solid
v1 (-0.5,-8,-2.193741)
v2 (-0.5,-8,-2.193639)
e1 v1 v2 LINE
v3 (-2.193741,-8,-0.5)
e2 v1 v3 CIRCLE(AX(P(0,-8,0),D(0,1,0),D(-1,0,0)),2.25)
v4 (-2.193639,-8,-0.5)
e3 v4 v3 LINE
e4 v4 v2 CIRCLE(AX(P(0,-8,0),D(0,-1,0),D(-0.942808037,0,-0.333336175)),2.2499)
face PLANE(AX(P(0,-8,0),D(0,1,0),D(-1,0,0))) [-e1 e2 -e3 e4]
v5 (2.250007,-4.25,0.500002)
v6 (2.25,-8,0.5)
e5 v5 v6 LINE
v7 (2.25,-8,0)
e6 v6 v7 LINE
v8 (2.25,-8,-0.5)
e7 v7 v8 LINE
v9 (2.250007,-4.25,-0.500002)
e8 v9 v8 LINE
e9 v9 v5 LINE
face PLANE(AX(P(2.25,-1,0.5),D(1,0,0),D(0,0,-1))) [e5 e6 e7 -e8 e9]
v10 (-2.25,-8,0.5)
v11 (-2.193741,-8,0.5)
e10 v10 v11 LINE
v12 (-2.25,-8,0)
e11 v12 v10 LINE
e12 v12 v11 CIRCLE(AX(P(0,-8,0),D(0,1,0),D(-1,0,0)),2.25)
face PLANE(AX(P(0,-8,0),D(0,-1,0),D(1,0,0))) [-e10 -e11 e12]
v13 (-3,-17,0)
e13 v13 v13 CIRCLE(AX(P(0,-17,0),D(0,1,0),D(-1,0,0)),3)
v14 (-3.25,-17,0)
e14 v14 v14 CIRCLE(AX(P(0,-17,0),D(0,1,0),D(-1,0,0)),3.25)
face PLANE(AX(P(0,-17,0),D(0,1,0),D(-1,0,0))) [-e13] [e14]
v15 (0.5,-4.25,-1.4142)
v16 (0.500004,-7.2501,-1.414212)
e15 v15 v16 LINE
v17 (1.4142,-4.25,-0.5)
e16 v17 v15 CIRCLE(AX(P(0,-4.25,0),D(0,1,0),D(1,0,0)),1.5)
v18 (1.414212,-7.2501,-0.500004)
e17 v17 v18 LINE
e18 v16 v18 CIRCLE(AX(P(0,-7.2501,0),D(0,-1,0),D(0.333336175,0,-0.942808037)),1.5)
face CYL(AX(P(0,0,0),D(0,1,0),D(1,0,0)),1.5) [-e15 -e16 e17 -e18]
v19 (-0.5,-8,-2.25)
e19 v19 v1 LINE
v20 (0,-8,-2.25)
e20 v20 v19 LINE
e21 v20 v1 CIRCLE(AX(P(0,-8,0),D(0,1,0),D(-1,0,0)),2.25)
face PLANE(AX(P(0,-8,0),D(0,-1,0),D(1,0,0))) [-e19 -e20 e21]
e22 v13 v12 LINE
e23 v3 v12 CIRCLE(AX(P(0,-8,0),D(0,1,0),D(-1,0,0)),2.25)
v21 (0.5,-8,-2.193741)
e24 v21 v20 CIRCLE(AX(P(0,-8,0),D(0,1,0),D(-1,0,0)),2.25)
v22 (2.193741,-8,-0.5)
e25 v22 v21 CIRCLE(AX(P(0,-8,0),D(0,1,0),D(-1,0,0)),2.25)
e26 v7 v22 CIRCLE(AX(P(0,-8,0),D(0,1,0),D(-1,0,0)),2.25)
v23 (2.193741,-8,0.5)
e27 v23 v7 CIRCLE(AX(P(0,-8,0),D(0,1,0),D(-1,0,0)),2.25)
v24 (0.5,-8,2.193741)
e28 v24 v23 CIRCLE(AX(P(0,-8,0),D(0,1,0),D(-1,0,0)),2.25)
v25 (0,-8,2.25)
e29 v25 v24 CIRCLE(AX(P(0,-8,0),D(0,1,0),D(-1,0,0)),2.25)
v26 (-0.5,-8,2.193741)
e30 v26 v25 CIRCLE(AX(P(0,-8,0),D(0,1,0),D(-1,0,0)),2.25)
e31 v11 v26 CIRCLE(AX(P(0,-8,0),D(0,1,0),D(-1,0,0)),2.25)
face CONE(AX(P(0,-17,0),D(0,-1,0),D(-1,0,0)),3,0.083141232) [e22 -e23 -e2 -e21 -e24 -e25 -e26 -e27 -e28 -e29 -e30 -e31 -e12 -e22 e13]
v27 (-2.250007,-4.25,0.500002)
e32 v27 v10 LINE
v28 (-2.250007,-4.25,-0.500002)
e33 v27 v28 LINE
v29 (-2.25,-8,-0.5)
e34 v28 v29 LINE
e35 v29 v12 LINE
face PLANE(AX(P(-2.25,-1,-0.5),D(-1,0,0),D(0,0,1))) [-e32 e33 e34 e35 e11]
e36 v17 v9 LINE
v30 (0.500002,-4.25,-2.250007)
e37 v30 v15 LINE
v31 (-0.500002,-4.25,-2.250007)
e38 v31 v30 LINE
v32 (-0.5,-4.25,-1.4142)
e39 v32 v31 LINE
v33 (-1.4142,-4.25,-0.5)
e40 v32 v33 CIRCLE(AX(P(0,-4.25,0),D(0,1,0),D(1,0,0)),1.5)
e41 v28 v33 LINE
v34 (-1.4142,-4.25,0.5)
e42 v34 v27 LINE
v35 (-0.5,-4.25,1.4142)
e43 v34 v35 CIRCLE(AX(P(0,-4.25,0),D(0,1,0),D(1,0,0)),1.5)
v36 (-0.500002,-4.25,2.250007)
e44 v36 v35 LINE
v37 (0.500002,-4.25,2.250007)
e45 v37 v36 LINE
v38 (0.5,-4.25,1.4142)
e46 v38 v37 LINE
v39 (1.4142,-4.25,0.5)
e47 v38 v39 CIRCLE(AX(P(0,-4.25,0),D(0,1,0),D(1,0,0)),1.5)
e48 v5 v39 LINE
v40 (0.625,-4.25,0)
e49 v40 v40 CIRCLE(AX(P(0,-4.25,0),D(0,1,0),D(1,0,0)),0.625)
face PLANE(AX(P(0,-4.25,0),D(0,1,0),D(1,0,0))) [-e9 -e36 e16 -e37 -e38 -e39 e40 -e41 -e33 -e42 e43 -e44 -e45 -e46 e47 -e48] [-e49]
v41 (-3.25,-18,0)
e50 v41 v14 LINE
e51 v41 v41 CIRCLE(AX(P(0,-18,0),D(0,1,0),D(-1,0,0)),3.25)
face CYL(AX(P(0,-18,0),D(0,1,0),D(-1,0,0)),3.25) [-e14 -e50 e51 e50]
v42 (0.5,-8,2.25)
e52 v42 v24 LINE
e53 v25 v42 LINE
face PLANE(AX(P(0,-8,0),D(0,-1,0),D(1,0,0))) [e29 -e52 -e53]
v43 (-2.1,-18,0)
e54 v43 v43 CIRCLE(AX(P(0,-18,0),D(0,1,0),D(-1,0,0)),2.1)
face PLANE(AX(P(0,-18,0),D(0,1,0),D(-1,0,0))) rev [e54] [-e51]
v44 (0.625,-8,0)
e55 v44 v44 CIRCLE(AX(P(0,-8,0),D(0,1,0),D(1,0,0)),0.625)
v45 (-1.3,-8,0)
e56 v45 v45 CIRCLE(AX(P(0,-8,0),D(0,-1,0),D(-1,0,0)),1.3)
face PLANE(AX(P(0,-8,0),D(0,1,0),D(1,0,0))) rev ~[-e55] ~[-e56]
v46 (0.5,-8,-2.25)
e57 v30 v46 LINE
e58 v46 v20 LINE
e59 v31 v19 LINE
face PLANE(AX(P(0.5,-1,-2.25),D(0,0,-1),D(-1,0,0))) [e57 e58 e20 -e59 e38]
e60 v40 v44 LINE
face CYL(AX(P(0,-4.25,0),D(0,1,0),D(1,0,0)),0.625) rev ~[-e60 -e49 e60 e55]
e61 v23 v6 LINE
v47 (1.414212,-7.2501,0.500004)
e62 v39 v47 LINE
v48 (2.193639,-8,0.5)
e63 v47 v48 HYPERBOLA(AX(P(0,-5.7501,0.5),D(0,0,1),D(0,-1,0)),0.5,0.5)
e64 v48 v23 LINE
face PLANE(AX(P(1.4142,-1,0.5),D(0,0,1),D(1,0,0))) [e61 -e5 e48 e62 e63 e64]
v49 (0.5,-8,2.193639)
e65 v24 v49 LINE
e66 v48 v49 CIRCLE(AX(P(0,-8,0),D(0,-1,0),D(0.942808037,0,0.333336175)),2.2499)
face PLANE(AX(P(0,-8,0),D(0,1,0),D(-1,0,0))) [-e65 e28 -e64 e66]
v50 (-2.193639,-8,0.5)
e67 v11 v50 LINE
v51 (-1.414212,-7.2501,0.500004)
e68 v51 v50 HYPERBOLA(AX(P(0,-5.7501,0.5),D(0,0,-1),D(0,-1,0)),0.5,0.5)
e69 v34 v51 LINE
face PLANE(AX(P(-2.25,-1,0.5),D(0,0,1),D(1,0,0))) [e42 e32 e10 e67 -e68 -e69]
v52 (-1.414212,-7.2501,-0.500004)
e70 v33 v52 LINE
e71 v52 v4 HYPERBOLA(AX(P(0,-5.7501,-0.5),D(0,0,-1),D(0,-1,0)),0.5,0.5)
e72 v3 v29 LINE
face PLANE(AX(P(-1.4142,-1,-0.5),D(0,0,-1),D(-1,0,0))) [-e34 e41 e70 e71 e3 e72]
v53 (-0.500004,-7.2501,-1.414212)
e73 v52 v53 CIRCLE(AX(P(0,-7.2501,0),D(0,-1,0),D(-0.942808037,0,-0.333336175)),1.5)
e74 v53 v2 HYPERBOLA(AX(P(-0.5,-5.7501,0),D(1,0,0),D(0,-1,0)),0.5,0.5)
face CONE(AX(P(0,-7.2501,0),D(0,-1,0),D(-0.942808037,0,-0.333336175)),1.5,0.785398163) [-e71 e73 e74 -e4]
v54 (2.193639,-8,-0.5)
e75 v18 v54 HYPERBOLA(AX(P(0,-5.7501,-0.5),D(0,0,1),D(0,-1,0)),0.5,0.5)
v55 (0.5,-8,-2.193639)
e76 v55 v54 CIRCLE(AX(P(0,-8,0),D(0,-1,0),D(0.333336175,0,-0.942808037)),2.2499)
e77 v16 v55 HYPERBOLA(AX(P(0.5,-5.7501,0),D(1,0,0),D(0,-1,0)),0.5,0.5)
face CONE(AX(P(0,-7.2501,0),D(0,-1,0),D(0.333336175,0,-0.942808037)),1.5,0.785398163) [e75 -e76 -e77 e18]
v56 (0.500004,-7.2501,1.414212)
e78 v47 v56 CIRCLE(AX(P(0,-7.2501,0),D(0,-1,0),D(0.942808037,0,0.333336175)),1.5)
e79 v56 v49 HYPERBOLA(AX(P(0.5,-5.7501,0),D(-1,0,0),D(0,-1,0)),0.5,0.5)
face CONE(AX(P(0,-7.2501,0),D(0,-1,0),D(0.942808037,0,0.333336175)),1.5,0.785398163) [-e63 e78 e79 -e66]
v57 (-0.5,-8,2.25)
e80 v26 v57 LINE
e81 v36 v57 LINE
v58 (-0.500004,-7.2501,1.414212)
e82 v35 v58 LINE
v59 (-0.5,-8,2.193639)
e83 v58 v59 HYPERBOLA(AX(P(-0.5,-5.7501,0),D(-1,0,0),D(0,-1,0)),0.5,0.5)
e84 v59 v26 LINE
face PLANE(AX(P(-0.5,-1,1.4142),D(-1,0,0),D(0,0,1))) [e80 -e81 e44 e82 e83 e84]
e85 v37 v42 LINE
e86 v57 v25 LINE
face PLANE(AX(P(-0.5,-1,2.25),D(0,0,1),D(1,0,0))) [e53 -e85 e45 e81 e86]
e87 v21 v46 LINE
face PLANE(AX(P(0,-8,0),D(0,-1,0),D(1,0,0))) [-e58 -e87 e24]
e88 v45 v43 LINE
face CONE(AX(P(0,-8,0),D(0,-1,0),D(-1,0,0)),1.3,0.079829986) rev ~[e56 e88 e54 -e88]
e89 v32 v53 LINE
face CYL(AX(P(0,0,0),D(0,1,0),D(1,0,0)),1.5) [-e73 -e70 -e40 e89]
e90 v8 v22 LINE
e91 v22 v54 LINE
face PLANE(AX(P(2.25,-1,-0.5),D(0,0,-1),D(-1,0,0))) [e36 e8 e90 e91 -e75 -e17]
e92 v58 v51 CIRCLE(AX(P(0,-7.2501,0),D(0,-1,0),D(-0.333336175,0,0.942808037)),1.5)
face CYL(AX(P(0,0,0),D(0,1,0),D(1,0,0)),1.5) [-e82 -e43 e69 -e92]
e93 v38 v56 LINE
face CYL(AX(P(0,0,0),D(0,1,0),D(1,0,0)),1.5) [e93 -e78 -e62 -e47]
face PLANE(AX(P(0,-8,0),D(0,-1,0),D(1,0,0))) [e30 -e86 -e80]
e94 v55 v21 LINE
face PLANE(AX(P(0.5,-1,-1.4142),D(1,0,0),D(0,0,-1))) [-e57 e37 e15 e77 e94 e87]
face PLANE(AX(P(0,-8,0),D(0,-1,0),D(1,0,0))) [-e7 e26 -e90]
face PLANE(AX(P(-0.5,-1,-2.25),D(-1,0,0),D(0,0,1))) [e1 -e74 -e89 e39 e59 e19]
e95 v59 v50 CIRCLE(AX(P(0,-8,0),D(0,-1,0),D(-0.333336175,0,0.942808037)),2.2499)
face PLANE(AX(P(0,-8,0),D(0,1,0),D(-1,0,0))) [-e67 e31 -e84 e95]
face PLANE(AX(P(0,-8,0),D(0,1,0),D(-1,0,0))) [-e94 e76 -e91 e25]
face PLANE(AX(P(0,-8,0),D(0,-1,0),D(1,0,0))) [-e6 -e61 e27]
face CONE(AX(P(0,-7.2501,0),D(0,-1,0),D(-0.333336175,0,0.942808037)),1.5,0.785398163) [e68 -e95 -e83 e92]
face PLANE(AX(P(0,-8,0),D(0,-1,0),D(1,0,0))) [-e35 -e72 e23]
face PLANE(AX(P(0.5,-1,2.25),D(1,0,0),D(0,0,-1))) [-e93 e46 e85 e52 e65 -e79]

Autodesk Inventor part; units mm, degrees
ref_plane "YZ Plane" through (0, 0, 0) normal (1, 0, 0) x (0, 1, 0)
ref_plane "XZ Plane" through (0, 0, 0) normal (0, 1, 0) x (-1, 0, 0)
ref_plane "XY Plane" through (0, 0, 0) normal (0, 0, 1) x (1, 0, 0)
sketch "Sketch1" plane through (0, 0, 0) normal (0, 1, 0) x (-1, 0, 0)
  circle A0 centre (0, 0) radius 0.525
  circle A1 centre (0, 0) radius 0.625
  dimension "d0" = 1.25
  dimension "d1" = 0.1
extrude "Extrusion1" add sketch "Sketch1" along normal blind 25
sketch "Sketch2" plane through (0, 0, 0) normal (1, 0, 0) x (0, 1, 0)
  line L0 (25, -0.625) -> (25, 0.625) construction
  line L1 (25, 0.625) -> (23.5, -0.625)
  line L2 (25, 0.625) -> (25, -0.625)
  line L3 (25, -0.625) -> (23.5, -0.625)
  point P0 (0, 0)
  dimension "d4" = 1.5
extrude "Extrusion2" cut sketch "Sketch2" along normal through all both and the other way through all
sketch "Sketch3" plane through (0, 0, 0) normal (0, -1, 0) x (1, 0, 0)
  circle A0 centre (0, 0) radius 1.5
  circle A1 centre (0, 0) radius 0.625
  circle A2 centre (0, 0) radius 0.625 construction
  dimension "d7" = 3
extrude "Extrusion3" add sketch "Sketch3" along normal blind 1 separate body
sketch "Sketch4" plane through (0, -1, 0) normal (0, -1, 0) x (1, 0, 0)
  line L0 (0.5, -1.4142) -> (0.5, -2.25)
  line L1 (0.5, -2.25) -> (-0.5, -2.25)
  line L2 (-0.5, -2.25) -> (-0.5, -1.4142)
  arc A0 (-0.5, -1.4142) -> (0.5, -1.4142) centre (0, 0) ccw
  circle A1 centre (0, 0) radius 1.5 projected
  line L3 (1.4142, 0.5) -> (2.25, 0.5)
  line L4 (2.25, 0.5) -> (2.25, -0.5)
  line L5 (2.25, -0.5) -> (1.4142, -0.5)
  arc A2 (1.4142, -0.5) -> (1.4142, 0.5) centre (0, 0) ccw
  line L6 (-0.5, 1.4142) -> (-0.5, 2.25)
  line L7 (-0.5, 2.25) -> (0.5, 2.25)
  line L8 (0.5, 2.25) -> (0.5, 1.4142)
  arc A3 (0.5, 1.4142) -> (-0.5, 1.4142) centre (0, 0) ccw
  line L9 (-1.4142, -0.5) -> (-2.25, -0.5)
  line L10 (-2.25, -0.5) -> (-2.25, 0.5)
  line L11 (-2.25, 0.5) -> (-1.4142, 0.5)
  arc A4 (-1.4142, 0.5) -> (-1.4142, -0.5) centre (0, 0) ccw
  circle A5 centre (0, 0) radius 1.5 construction
  circle A6 centre (0, 0) radius 1.5 construction
  circle A7 centre (0, 0) radius 1.5
  circle A8 centre (0, 0) radius 1.3
  dimension "d20" = 2.25
  dimension "d21" = 1
  dimension "d24" = 360
  dimension "d26" = 0.2
extrude "Extrusion4" add sketch "Sketch4" along normal blind 7 bodies 2
sketch "Sketch5" plane through (0, 0, 0) normal (0, 0, 1) x (1, 0, 0)
  line L0 (1.3, -8) -> (-1.3, -8) construction
  line L1 (-1.3, -8) -> (-2.1, -18)
  line L2 (-2.1, -18) -> (-3.25, -18)
  line L3 (-3.25, -18) -> (-3.25, -17)
  line L4 (-3.25, -17) -> (-3, -17)
  line L5 (-2.25, -8) -> (-1.4142, -8) construction
  line L6 (-3, -17) -> (-2.25, -8)
  line L7 (-2.25, -8) -> (-1.3, -8)
  line L8 (0, -26.6) -> (0, 33.6) projected
  point P0 (0, 0)
  dimension "d27" = 2.1
  dimension "d28" = 3.25
  dimension "d29" = 3
  dimension "d30" = 9
  dimension "d31" = 1
revolve "Revolution1" add sketch "Sketch5" angle 360 about axis through (0, -10, 0) along (0, 1, 0) bodies 2
chamfer "Chamfer1" distance 0.25 angle 45 4 edges at (2.25, -1, 0) (0, -1, -2.25) (-2.25, -1, 0) (0, -1, 2.25)
chamfer "Chamfer2" distance 0.75 angle 45 4 edges at (1.0607, -8, 1.0607) (1.0607, -8, -1.0607) (-1.0607, -8, -1.0607) (-1.0607, -8, 1.0607)
sketch "Sketch7" plane through (0, 0, 0) normal (0, 1, 0) x (1, 0, 0)
  circle A0 centre (0, 0) radius 0.625 projected
  circle A1 centre (0, 0) radius 2.3049
  point P0 (0.5, 2.25)
extrude "Extrusion6" cut sketch "Sketch7" along normal blind 30 and the other way blind 4.25 contours A0 | A1 bodies 2 1
sketch "Sketch8" plane through (0, -4.25, 0) normal (0, 1, 0) x (1, 0, 0)
  circle A0 centre (0, 0) radius 0.625
  circle A1 centre (0, 0) radius 1.3 projected
  dimension "d49" = 1.25
extrude "Extrusion7" add sketch "Sketch8" against normal blind 3.75 bodies 2
properties part number "CH_01_0030_needle_1"
